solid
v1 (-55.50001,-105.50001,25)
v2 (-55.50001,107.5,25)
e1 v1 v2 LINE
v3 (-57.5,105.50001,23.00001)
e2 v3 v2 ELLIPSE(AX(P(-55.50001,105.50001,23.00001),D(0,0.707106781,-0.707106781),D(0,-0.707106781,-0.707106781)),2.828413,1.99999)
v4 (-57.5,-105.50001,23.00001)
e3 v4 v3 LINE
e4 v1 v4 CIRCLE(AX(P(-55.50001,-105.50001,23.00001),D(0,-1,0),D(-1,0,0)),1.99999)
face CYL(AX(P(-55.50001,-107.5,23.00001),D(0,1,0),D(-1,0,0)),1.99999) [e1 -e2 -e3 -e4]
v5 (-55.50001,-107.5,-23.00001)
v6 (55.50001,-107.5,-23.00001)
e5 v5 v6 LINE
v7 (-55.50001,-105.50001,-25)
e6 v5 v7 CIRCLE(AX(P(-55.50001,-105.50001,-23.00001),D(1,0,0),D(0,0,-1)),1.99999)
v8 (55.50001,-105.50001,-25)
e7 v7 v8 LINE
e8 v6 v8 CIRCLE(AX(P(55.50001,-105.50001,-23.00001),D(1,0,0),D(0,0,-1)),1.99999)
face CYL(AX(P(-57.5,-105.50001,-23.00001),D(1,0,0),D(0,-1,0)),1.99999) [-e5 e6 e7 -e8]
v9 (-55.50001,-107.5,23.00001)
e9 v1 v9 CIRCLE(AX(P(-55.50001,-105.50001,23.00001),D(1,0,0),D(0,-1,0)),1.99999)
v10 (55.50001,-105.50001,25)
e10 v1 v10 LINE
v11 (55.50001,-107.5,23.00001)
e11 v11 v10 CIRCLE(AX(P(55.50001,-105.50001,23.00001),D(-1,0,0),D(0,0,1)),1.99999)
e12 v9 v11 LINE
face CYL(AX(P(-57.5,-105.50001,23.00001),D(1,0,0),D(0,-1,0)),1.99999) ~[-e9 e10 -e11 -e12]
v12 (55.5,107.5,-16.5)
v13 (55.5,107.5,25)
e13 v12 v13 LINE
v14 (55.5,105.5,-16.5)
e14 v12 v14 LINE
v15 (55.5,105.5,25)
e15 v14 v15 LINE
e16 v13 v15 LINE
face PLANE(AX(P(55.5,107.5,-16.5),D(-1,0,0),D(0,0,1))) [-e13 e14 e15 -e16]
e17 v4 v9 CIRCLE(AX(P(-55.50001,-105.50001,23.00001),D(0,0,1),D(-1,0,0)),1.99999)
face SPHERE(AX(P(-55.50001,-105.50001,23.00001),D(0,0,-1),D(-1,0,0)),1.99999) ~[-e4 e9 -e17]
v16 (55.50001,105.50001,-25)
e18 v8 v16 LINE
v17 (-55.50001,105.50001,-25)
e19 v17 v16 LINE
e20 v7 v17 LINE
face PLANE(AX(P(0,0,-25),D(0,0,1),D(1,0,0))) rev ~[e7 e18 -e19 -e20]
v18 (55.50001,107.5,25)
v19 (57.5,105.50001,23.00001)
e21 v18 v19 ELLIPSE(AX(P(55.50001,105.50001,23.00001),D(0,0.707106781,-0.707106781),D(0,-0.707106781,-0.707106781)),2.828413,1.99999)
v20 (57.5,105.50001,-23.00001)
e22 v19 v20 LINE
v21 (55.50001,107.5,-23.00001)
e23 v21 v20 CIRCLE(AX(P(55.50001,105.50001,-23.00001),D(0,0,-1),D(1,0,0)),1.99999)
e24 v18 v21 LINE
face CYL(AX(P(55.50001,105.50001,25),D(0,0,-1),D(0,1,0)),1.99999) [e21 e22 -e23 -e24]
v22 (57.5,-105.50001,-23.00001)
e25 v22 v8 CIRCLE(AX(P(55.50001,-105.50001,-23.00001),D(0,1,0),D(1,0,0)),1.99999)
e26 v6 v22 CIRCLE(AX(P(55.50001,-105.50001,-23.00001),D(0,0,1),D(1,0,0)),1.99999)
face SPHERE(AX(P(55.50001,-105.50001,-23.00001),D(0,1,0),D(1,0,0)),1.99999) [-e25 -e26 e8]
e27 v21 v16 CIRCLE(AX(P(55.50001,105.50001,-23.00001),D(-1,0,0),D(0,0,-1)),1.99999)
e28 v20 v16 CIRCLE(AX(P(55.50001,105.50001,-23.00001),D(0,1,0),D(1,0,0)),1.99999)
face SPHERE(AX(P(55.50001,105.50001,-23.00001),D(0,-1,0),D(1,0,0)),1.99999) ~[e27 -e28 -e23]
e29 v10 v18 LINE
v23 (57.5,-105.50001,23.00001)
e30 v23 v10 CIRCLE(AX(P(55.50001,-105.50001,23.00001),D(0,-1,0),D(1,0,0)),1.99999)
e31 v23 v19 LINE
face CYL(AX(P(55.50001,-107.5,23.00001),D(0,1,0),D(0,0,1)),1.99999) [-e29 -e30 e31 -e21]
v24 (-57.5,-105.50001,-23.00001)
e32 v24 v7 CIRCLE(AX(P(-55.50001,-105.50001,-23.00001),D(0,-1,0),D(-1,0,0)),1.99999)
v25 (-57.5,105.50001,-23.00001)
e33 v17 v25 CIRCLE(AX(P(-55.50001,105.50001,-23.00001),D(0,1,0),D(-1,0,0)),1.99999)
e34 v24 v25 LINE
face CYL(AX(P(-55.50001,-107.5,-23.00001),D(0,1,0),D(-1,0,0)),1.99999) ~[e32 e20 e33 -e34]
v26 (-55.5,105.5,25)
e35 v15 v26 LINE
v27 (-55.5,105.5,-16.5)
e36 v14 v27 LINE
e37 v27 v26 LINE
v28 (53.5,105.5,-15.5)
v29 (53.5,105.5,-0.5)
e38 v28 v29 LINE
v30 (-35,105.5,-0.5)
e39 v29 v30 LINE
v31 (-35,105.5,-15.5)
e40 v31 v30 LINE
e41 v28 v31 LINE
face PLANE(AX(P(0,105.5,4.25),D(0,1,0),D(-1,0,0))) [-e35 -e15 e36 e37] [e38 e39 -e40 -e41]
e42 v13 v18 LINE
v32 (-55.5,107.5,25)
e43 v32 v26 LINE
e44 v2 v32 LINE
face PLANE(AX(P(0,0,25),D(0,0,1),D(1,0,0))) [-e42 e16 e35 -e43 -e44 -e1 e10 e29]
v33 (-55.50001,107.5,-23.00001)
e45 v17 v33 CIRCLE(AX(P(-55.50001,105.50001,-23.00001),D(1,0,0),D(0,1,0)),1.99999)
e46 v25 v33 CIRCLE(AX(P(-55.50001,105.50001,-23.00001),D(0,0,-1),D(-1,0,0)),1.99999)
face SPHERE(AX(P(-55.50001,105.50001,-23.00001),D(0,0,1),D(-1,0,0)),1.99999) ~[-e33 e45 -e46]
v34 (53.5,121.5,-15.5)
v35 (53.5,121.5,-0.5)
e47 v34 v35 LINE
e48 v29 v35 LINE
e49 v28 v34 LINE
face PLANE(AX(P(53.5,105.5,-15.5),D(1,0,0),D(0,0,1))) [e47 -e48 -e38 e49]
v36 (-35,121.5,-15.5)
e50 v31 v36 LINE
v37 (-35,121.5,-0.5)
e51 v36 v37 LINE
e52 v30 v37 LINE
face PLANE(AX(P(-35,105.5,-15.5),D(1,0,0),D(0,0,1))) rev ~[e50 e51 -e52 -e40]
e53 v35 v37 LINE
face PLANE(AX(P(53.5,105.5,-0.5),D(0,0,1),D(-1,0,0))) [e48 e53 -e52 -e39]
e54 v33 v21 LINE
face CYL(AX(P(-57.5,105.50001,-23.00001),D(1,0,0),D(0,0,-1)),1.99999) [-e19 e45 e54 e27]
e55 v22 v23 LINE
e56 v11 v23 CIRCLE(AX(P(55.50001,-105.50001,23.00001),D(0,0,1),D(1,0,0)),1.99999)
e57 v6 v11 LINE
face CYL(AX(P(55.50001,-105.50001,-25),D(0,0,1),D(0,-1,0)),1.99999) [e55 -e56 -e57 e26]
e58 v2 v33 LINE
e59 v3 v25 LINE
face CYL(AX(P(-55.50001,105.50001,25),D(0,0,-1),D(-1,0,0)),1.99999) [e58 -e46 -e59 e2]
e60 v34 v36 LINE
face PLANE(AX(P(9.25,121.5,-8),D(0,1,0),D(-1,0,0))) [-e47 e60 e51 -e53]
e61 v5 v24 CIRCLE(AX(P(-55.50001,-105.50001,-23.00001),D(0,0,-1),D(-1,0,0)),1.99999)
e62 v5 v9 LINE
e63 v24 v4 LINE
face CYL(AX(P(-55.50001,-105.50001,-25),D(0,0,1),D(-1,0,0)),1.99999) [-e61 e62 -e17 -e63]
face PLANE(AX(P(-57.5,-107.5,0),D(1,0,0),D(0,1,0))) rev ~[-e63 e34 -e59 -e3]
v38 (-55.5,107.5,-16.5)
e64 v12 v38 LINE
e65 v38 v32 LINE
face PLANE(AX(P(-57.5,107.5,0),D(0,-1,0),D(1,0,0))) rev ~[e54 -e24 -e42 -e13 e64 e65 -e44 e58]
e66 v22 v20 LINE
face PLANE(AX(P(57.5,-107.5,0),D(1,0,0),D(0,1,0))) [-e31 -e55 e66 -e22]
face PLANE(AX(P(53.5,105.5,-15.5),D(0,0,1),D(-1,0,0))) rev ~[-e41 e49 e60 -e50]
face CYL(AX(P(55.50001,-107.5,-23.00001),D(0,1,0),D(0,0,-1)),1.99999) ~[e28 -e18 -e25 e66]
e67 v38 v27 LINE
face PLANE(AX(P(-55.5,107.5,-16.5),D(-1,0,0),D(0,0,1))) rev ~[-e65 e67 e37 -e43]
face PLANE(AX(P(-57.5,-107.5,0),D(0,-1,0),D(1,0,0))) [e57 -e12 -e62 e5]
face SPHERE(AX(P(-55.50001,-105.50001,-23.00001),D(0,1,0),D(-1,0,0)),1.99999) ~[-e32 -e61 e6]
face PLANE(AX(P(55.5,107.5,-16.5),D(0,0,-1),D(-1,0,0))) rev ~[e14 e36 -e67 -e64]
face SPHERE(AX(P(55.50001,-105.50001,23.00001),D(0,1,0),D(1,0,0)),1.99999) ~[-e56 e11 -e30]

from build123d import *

# Parameters (mm, degrees)
F0_W     = 115
F0_H     = 215
F1_DEPTH = 25
F2_W     = 111
F2_H     = 41.5
F3_DEPTH = 2
F4_W     = 88.5
F4_H     = 15
F5_DEPTH = 16
F6_R     = 1.99999


# Not quite as in the source:
# - a fillet or chamfer is up to 0.001 mm smaller than in the source, because OpenCascade refuses the exact size


with BuildPart() as f1:
    # F0 (on Top) → F1 (new body, symmetric)
    with BuildSketch(Plane.XY):
        Rectangle(F0_W, F0_H)
    extrude(amount=F1_DEPTH, both=True)

    # F2 (on face) → F3 (cut)
    with BuildSketch(Plane(origin=(0, 107.5, 0), x_dir=(-1, 0, 0), z_dir=(0, 1, 0))):
        with Locations((0, 4.25)):
            Rectangle(F2_W, F2_H)
    extrude(amount=-F3_DEPTH, mode=Mode.SUBTRACT)

    # F4 (on face) → F5 (join)
    with BuildSketch(Plane(origin=(0, 105.5, 0), x_dir=(-1, 0, 0), z_dir=(0, 1, 0))):
        with Locations((-9.25, -8)):
            Rectangle(F4_W, F4_H)
    extrude(amount=F5_DEPTH)

    # F6 (radius 2 in the source; OpenCascade refuses exactly that, so slightly less here)
    f6_edges = [f1.edges().sort_by_distance(p)[0] for p in [
        (-57.5, 107.5, 0),
        (-57.5, 0, -25),
        (-57.5, -107.5, 0),
        (-57.5, 0, 25),
        (57.5, 0, -25),
        (57.5, 107.5, 0),
        (57.5, 0, 25),
        (57.5, -107.5, 0),
        (0, 107.5, -25),
        (0, -107.5, -25),
        (0, -107.5, 25),
    ]]
    fillet(f6_edges, radius=F6_R)


solid = f1.part
